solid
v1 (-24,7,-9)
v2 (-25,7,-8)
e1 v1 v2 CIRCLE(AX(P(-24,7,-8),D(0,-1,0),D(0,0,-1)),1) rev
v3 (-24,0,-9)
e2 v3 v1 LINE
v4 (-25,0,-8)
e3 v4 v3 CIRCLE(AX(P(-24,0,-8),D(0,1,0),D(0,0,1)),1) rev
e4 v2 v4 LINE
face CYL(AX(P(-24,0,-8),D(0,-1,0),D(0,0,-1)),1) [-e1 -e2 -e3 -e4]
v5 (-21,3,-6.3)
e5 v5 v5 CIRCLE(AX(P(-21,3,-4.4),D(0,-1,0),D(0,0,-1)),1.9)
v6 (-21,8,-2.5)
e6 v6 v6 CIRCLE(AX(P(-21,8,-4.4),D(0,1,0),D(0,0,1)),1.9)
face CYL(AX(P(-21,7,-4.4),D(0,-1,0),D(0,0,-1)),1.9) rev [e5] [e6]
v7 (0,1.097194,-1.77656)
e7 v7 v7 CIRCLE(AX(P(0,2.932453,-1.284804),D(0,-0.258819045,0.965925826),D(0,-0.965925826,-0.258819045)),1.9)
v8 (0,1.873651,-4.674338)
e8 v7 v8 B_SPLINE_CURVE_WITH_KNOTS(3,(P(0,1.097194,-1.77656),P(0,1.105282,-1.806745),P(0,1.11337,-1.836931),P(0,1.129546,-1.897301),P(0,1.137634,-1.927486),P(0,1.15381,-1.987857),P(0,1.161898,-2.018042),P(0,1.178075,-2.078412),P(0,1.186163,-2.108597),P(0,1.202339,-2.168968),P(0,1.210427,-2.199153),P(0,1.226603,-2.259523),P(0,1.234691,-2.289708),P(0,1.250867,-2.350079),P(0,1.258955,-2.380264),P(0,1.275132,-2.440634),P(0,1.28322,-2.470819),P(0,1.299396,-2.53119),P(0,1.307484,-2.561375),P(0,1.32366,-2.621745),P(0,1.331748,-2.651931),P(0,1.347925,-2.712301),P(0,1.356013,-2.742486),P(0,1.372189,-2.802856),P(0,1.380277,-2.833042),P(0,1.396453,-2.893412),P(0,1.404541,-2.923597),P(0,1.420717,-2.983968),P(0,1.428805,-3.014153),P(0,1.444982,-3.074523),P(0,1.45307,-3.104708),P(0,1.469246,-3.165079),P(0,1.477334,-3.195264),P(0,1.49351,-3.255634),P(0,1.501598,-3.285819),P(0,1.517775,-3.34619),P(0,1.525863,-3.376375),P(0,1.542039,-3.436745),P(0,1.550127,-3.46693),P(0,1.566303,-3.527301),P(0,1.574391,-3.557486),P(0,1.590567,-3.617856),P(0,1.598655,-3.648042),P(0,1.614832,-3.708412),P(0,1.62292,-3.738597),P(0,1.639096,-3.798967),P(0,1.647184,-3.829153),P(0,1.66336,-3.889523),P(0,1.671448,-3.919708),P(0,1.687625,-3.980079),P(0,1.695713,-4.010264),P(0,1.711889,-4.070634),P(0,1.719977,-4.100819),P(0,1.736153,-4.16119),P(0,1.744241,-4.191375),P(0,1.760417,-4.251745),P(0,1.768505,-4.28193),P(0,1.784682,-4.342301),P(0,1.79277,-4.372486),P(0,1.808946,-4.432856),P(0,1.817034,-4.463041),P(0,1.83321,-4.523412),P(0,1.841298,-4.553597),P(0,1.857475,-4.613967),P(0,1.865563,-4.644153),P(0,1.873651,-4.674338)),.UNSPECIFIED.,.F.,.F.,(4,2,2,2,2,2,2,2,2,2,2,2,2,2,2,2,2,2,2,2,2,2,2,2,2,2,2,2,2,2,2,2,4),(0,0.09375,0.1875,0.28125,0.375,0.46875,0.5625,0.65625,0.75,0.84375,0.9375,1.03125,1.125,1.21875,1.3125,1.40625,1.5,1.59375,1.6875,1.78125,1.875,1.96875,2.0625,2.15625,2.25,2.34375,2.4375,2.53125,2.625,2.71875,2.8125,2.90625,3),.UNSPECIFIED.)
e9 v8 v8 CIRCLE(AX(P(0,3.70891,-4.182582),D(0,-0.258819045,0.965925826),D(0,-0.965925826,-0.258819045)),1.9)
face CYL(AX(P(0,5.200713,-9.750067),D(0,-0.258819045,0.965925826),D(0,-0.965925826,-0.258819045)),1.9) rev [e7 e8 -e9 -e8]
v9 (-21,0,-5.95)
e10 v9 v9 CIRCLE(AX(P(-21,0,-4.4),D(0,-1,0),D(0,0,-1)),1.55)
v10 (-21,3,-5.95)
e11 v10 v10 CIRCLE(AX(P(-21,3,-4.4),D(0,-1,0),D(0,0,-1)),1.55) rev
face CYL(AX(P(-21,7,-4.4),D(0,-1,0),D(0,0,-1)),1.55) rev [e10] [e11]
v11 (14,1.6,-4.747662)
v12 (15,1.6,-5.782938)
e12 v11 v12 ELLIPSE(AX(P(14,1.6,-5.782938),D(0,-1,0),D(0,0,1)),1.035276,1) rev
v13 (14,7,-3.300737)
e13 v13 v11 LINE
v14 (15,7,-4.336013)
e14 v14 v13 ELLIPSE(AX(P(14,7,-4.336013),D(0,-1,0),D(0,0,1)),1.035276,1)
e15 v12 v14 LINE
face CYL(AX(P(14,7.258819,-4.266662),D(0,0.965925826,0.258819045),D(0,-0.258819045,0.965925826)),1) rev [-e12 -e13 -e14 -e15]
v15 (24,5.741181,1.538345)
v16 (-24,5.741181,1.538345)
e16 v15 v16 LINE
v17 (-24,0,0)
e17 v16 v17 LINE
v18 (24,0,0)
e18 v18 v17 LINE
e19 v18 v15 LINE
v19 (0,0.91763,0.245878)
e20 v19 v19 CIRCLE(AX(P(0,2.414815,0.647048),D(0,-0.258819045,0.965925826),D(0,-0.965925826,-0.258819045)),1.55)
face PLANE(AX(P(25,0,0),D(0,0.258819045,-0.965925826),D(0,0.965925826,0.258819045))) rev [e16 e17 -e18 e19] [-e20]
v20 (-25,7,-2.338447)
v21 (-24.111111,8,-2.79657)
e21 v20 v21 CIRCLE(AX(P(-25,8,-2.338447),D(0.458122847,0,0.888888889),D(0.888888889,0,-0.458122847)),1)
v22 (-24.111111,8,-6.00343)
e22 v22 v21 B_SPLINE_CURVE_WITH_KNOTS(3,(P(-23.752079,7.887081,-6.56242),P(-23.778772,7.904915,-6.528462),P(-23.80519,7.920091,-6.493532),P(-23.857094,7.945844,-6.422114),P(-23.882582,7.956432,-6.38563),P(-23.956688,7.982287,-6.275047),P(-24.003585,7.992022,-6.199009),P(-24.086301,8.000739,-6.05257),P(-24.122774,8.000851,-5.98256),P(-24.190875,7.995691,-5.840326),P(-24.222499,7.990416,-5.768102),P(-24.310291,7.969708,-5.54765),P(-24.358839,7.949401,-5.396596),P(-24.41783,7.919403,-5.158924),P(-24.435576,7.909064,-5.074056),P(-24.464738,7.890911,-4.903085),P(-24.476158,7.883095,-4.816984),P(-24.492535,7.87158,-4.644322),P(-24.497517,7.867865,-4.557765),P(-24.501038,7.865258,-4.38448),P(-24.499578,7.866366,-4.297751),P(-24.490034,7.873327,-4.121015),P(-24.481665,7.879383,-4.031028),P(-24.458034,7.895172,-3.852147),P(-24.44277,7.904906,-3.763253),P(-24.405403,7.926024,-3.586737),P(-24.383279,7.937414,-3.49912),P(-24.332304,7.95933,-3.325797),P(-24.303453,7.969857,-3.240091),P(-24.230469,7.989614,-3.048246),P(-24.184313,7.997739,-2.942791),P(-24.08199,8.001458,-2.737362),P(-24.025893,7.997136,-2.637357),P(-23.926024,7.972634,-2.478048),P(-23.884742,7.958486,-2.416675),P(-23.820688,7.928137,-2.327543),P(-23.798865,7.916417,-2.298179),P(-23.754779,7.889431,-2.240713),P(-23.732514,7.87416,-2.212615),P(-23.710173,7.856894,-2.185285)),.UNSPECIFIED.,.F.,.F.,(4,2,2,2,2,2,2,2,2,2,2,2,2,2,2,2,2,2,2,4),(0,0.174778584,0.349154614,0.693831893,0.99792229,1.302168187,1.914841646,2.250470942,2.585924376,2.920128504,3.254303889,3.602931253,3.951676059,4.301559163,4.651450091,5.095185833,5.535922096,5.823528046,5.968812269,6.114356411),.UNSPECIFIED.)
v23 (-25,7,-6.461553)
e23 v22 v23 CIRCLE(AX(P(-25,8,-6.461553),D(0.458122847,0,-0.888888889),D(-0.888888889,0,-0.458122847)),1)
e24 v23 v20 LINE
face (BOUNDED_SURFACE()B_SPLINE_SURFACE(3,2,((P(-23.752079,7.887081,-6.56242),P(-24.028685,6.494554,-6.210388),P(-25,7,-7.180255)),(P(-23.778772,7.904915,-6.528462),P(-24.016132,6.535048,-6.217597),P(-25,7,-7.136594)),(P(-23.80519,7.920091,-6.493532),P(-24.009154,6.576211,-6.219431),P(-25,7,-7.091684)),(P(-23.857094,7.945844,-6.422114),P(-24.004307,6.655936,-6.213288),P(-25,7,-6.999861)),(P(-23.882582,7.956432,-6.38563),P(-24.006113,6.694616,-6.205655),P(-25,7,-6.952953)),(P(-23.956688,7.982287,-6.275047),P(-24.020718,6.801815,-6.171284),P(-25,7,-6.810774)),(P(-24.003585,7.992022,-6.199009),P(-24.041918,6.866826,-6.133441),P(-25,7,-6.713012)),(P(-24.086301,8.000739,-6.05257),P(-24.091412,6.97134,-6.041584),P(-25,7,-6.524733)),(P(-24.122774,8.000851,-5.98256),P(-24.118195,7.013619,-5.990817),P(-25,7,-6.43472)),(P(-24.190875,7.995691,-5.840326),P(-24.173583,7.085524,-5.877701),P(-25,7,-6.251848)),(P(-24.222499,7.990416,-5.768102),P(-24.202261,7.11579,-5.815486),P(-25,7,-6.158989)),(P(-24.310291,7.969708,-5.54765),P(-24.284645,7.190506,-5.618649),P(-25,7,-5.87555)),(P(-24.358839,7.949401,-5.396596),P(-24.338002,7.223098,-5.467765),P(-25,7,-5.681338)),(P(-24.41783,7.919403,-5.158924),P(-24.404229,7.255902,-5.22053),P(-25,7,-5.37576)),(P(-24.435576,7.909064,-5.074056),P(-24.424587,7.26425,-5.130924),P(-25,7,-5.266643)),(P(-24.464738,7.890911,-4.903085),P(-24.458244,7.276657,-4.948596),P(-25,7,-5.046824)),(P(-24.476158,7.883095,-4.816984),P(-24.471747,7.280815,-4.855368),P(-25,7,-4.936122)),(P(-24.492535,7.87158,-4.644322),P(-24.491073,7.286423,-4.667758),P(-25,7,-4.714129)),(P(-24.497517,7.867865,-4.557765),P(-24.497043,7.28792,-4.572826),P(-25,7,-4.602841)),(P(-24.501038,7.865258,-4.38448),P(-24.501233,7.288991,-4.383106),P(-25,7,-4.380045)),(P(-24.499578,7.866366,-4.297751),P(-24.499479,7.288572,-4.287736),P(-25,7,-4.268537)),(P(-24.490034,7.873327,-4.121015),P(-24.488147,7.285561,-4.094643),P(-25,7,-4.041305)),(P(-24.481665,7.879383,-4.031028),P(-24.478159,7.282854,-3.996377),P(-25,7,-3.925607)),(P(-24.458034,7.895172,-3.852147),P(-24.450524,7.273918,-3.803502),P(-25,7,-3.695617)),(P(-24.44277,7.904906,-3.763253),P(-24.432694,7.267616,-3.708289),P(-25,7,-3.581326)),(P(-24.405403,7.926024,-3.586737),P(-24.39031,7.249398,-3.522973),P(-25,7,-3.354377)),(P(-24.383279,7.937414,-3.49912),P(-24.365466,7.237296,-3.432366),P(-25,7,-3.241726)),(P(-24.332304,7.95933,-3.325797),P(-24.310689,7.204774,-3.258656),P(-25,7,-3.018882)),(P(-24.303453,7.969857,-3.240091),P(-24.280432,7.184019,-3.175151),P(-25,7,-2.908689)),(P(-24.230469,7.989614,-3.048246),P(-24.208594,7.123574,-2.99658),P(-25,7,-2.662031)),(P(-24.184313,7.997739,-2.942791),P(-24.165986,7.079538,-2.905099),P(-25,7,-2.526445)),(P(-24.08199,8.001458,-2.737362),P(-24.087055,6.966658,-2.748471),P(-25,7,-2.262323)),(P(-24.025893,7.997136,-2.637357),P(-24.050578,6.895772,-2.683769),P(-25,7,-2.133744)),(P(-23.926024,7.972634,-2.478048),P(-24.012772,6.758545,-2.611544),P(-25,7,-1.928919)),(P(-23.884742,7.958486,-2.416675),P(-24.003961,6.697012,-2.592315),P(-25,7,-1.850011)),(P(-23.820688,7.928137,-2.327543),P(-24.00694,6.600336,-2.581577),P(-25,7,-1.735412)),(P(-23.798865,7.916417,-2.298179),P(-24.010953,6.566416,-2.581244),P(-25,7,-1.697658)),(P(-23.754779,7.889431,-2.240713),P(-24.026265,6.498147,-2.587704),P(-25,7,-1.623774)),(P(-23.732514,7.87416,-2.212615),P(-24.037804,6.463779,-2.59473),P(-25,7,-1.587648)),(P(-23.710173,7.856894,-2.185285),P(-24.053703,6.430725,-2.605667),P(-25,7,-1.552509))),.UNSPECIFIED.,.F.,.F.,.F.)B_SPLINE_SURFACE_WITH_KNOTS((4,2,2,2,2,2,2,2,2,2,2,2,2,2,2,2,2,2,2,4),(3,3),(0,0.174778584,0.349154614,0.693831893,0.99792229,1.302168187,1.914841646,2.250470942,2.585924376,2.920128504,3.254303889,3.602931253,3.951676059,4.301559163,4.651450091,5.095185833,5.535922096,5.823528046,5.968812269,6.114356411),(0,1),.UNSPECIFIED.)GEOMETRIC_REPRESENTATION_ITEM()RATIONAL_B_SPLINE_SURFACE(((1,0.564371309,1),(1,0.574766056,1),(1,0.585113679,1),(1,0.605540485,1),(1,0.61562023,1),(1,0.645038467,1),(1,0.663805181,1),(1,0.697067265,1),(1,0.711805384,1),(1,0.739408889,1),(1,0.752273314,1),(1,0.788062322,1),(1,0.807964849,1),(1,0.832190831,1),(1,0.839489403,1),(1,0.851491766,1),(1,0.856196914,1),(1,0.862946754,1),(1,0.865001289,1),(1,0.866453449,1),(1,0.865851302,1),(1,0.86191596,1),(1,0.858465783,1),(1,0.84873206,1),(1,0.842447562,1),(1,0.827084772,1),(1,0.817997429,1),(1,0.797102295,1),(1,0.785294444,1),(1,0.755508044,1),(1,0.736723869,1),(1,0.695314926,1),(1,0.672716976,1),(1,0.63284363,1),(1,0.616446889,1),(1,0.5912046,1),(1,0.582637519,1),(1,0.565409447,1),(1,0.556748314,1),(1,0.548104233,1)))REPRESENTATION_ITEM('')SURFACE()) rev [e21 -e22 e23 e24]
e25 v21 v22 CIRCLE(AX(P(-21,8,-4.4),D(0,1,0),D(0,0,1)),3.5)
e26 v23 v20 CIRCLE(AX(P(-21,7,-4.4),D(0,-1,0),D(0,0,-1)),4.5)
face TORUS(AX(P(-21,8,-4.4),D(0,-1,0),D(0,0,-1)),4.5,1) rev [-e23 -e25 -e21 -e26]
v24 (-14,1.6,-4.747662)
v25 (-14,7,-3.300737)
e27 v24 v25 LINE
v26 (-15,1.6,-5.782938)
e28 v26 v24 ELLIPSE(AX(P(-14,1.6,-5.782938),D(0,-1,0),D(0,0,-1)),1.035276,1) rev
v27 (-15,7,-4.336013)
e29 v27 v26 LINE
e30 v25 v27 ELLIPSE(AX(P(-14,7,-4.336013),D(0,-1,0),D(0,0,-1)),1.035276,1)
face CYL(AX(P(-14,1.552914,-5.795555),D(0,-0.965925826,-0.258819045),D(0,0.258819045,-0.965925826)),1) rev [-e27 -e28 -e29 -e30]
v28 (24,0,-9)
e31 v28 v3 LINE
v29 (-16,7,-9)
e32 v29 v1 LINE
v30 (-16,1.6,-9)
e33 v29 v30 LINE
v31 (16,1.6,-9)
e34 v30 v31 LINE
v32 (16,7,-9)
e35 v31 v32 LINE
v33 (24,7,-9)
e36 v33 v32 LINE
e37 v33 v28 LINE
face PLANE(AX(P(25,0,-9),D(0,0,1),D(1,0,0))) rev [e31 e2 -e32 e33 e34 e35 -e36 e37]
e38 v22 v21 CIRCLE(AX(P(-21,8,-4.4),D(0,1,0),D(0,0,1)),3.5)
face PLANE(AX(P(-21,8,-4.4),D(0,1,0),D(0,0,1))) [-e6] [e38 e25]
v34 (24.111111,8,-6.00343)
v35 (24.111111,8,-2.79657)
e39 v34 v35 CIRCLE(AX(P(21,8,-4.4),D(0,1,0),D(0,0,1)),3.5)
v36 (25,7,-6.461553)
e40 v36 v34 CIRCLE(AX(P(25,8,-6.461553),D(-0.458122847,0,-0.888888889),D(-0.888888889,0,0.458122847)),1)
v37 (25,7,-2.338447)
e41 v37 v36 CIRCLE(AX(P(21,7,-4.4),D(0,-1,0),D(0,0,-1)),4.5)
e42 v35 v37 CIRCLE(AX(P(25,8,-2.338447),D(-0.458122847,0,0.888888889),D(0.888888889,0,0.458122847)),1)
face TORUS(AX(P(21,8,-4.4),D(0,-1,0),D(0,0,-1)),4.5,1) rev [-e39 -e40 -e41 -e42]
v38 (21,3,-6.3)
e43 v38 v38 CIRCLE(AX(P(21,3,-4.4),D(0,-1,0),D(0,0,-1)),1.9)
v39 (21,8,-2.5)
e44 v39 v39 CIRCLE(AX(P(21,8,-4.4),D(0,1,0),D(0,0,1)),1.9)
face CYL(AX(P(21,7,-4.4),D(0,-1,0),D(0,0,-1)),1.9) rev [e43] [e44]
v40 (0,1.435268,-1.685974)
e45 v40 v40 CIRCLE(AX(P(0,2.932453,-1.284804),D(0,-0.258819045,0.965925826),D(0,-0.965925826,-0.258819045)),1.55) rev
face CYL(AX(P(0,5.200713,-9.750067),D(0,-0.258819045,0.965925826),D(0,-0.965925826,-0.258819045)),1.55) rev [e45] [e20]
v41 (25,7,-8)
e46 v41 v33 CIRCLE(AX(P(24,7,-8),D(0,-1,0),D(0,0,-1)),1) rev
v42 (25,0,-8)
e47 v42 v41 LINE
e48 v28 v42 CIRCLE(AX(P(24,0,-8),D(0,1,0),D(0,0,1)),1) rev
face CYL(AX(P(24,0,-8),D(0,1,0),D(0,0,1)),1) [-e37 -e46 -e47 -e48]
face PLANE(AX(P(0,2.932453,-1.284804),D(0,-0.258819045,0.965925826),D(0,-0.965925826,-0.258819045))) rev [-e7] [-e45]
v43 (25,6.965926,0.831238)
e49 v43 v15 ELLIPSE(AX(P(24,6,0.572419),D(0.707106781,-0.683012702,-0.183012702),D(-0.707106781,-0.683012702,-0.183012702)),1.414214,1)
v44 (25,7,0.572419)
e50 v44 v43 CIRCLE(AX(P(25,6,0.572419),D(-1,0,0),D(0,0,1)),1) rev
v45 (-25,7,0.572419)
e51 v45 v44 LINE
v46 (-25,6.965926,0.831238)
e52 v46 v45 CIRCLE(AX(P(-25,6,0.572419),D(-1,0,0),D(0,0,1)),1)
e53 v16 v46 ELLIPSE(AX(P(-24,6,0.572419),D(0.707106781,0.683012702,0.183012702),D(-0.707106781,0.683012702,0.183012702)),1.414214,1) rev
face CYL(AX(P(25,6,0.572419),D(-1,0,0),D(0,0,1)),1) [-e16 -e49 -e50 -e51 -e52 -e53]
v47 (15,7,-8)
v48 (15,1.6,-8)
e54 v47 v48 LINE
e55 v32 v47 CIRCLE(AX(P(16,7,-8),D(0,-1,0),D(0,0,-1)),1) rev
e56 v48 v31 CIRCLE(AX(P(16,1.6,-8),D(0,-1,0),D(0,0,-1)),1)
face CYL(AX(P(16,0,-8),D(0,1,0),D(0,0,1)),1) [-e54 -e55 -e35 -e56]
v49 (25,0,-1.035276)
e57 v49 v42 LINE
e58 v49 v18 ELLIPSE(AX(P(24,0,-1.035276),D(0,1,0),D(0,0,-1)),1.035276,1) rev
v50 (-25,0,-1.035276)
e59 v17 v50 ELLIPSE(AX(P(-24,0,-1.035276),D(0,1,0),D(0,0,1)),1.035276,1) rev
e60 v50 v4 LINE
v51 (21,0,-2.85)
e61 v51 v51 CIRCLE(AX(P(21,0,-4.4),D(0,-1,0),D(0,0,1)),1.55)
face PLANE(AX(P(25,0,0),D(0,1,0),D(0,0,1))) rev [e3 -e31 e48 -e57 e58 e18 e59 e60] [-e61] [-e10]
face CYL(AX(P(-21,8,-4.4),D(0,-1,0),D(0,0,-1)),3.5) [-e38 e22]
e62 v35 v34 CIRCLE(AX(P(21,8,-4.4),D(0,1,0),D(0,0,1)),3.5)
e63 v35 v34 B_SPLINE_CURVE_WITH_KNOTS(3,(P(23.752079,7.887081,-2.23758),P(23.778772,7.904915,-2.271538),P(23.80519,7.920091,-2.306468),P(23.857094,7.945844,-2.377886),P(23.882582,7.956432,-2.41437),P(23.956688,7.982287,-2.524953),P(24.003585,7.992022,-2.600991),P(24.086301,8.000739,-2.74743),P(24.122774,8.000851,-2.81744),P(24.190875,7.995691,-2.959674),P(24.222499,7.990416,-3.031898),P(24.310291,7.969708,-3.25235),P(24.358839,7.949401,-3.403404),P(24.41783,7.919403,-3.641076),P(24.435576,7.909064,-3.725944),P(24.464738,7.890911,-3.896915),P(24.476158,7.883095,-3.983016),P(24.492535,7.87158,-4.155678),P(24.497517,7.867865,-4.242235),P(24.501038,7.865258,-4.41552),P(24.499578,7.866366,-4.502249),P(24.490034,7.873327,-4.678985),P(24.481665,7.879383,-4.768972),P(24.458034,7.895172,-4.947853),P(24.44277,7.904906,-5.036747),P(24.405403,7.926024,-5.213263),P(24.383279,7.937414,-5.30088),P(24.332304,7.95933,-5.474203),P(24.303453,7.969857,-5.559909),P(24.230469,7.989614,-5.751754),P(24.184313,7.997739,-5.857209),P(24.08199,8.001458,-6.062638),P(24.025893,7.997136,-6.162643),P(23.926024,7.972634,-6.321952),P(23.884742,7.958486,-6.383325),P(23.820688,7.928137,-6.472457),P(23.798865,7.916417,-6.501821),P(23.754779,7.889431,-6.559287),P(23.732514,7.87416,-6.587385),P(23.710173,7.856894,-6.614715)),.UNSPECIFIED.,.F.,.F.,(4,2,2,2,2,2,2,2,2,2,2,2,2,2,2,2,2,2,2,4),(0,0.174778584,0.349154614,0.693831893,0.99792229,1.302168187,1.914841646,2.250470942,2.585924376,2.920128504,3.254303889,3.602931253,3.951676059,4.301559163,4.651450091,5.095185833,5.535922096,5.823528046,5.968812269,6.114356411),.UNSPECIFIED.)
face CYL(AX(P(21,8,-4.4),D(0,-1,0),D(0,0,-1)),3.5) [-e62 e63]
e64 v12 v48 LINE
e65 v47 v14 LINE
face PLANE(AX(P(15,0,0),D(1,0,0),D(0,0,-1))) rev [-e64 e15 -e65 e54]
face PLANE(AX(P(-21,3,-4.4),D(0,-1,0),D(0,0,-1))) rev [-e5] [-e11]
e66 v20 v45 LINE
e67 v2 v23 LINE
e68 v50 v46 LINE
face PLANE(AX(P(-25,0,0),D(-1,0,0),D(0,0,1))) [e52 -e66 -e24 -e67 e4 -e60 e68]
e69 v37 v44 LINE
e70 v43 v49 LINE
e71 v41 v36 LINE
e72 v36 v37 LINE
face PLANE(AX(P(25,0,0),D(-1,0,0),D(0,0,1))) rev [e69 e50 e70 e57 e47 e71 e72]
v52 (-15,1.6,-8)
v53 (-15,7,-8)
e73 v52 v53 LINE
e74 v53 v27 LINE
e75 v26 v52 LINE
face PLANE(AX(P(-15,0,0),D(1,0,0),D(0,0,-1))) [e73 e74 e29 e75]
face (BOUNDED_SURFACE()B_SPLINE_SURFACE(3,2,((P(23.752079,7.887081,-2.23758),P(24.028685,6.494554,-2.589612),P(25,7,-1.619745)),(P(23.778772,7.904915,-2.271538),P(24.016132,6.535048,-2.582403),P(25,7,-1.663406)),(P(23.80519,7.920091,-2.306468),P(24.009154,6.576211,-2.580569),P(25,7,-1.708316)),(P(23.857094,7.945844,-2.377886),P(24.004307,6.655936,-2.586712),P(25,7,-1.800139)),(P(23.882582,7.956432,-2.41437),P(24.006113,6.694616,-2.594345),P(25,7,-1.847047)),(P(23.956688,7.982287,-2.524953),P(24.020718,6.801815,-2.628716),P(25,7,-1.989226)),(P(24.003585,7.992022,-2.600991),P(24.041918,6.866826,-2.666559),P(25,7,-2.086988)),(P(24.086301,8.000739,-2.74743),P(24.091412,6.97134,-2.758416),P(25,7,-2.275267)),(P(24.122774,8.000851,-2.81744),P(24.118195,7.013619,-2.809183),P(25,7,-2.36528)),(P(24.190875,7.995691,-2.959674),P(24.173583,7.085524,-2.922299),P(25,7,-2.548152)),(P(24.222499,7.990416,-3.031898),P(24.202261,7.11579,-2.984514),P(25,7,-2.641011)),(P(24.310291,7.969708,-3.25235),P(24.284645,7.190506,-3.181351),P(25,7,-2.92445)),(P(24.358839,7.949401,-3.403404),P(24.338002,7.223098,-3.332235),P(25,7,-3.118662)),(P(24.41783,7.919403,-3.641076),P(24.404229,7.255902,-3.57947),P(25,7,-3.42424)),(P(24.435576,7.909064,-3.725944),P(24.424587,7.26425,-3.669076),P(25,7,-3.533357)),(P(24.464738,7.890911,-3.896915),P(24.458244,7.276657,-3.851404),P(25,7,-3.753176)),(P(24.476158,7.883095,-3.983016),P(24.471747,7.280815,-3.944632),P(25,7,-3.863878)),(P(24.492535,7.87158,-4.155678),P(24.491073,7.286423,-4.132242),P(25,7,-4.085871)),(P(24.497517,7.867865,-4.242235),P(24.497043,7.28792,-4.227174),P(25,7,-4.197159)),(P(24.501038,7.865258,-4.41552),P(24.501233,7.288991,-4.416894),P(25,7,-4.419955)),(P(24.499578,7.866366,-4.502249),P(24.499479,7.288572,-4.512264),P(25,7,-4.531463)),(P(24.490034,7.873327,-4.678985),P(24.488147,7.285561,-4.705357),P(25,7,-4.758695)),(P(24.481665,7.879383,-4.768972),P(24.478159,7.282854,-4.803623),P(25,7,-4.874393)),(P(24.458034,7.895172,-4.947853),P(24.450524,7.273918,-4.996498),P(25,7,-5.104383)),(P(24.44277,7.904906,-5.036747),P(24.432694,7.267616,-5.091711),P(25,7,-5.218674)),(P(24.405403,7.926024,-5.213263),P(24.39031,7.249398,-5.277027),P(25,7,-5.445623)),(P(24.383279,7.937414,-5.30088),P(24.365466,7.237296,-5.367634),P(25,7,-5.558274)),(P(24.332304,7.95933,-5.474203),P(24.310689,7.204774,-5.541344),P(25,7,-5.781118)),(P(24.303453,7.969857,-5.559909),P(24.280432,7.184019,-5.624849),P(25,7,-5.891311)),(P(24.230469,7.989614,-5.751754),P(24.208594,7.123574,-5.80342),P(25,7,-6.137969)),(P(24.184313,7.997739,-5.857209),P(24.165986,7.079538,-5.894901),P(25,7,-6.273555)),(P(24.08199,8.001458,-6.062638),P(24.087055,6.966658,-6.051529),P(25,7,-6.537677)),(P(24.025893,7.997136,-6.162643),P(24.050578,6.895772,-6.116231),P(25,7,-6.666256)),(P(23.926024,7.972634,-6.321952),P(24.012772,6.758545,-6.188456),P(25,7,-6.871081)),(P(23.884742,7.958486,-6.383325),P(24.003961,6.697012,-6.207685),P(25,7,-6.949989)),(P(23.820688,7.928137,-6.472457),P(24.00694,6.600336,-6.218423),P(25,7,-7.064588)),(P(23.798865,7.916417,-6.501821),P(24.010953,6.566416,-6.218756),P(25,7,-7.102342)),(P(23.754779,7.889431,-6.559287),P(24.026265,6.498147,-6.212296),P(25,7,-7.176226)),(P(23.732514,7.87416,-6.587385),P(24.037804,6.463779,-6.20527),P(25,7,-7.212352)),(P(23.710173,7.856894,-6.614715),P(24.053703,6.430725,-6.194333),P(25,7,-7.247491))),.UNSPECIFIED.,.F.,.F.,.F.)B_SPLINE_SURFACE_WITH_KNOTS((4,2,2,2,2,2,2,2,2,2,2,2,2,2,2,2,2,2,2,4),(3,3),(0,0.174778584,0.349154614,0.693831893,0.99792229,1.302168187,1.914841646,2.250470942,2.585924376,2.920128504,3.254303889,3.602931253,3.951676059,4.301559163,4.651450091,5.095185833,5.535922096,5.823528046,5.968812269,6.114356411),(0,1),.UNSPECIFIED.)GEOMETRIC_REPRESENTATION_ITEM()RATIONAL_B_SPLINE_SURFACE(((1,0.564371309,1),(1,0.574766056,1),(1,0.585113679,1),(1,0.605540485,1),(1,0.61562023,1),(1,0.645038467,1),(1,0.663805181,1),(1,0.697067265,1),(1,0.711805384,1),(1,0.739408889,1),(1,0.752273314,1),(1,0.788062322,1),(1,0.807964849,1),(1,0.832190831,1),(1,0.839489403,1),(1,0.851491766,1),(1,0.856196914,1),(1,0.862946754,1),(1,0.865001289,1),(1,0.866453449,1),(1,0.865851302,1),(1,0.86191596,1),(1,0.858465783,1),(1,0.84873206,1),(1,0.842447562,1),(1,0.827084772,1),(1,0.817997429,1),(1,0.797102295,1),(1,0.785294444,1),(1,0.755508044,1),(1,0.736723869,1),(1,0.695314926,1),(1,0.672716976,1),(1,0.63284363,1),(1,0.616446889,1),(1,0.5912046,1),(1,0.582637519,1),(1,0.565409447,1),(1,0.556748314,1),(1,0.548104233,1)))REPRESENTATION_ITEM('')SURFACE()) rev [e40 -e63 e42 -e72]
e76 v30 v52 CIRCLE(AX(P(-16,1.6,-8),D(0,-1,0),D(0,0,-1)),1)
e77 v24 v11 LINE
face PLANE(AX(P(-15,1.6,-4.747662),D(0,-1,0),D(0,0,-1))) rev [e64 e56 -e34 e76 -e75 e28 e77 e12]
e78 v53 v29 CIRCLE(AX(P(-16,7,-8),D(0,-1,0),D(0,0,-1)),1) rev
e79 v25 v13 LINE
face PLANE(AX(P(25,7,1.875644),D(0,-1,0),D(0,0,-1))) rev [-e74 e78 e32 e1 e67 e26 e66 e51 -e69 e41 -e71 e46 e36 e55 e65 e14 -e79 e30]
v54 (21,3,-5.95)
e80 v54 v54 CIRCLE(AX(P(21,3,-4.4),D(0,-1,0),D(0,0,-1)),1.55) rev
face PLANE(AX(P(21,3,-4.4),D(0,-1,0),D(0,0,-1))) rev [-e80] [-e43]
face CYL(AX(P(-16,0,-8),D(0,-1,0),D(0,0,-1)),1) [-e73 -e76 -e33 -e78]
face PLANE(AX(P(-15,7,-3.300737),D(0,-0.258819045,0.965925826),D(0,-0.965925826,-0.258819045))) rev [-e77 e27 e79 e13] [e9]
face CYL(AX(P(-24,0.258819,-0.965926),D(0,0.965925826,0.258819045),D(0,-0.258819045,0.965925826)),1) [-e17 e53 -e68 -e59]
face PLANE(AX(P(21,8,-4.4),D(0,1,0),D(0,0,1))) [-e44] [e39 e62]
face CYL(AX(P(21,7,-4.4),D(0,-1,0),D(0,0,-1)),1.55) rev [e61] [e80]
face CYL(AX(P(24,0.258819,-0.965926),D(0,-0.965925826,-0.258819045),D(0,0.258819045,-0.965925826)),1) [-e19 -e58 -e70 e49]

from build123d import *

# Parameters (mm, degrees)
BOSS_EXTRU_1_DEPTH      = 25
ESQUISSE2_R             = 1.55
ENL_V_MAT_EXTRU_1_DEPTH = 28.477263328
ENL_V_START             = -3
ESQUISSE3_R             = 1.9
ENL_V_MAT_EXTRU_2_DEPTH = 25.477263328
ESQUISSE4_R             = 3.5
ESQUISSE4_R_2           = 1.9
BOSS_EXTRU_2_DEPTH      = 8
ENL_V_MAT_EXTRU_3_DEPTH = 15
ESQUISSE7_R             = 1.55
ENL_V_MAT_EXTRU_4_DEPTH = 28.748873851
ENL_V_START_2           = -2
ESQUISSE8_R             = 1.9
ENL_V_MAT_EXTRU_5_DEPTH = 26.748873851
CONG_1_R                = 1
CONG_2_START            = -26
CONG_2_DEPTH            = 52


with BuildPart() as part:
    # Esquisse1 → Boss.-Extru.1 (new, symmetric)
    with BuildSketch(Plane(origin=(0, 0, 0), x_dir=(0, 0, -1), z_dir=(1, 0, 0))):
        Polygon((0, 0), (9, 0), (9, 7), (-1.875644347, 7), align=None)
    extrude(amount=BOSS_EXTRU_1_DEPTH, both=True)

    # Esquisse2 → Enlèv. mat.-Extru.1 (cut, through all)
    with BuildSketch(Plane.XZ):
        with Locations(Location((-21, -4.4, 0), (0, 0, 270))):
            Circle(ESQUISSE2_R)
        with Locations(Location((21, -4.4, 0), (0, 0, 90))):
            Circle(ESQUISSE2_R)
    extrude(amount=-ENL_V_MAT_EXTRU_1_DEPTH, mode=Mode.SUBTRACT)

    # Esquisse3 → Enlèv. mat.-Extru.2 (cut, through all)
    with BuildSketch(Plane.XZ.offset(ENL_V_START)):
        with Locations(Location((-21, -4.4, 0), (0, 0, 270))):
            Circle(ESQUISSE3_R)
        with Locations(Location((21, -4.4, 0), (0, 0, 270))):
            Circle(ESQUISSE3_R)
    extrude(amount=-ENL_V_MAT_EXTRU_2_DEPTH, mode=Mode.SUBTRACT)

    # Esquisse4 → Boss.-Extru.2 (add)
    # profile 1 of 2: a face of its own
    with BuildSketch(Plane(origin=(0, 0, 0), x_dir=(1, 0, 0), z_dir=(0, 1, 0))):
        with Locations(Location((-21, 4.4, 0), (0, 0, 90))):
            Circle(ESQUISSE4_R)
        with Locations(Location((-21, 4.4, 0), (0, 0, 90))):
            Circle(ESQUISSE4_R_2, mode=Mode.SUBTRACT)
    # profile 2 of 2: a face of its own
    with BuildSketch(Plane(origin=(0, 0, 0), x_dir=(1, 0, 0), z_dir=(0, 1, 0))):
        with Locations(Location((21, 4.4, 0), (0, 0, 90))):
            Circle(ESQUISSE4_R)
        with Locations(Location((21, 4.4, 0), (0, 0, 90))):
            Circle(ESQUISSE4_R_2, mode=Mode.SUBTRACT)
    extrude(amount=BOSS_EXTRU_2_DEPTH)

    # Esquisse6 → Enlèv. mat.-Extru.3 (cut, symmetric)
    with BuildSketch(Plane(origin=(0, 0, 0), x_dir=(0, 0, -1), z_dir=(1, 0, 0))):
        Polygon((3.300736555, 7), (4.747662194, 1.6), (9, 1.6), (9, 7), align=None)
    extrude(amount=ENL_V_MAT_EXTRU_3_DEPTH, both=True, mode=Mode.SUBTRACT)

    # Esquisse7 → Enlèv. mat.-Extru.4 (cut, through all)
    with BuildSketch(Plane(origin=(0, 0, 0), x_dir=(1, 0, 0), z_dir=(0, -0.25881904510252496, 0.9659258262890672))):
        with Locations(Location((0, 2.5, 0), (0, 0, 270))):
            Circle(ESQUISSE7_R)
    extrude(amount=-ENL_V_MAT_EXTRU_4_DEPTH, mode=Mode.SUBTRACT)

    # Esquisse8 → Enlèv. mat.-Extru.5 (cut, through all)
    with BuildSketch(Plane(origin=(0, 0, 0), x_dir=(1, 0, 0), z_dir=(0, -0.25881904510252496, 0.9659258262890672)).offset(ENL_V_START_2)):
        with Locations(Location((0, 2.5, 0), (0, 0, 270))):
            Circle(ESQUISSE8_R)
    extrude(amount=-ENL_V_MAT_EXTRU_5_DEPTH, mode=Mode.SUBTRACT)

    # Congé1
    cong_1_edges = [part.edges().sort_by_distance(p)[0] for p in [
        (25, 3.5, -9),
        (-21, 7, -0.9),
        (25, 3.5, 0.937822174),
        (21, 7, -0.9),
        (-25, 3.5, -9),
        (-25, 3.5, 0.937822174),
        (-15, 4.3, -9),
        (-15, 4.3, -4.024199375),
        (15, 4.3, -9),
        (15, 4.3, -4.024199375),
    ]]
    fillet(cong_1_edges, radius=CONG_1_R - 0.0001)  # a hair under: the kernel refuses the full size

    # Congé2: read off the stored shape, not the designer's step
    # Congé2 outline → Congé2 (cut)
    with BuildSketch(Plane.YZ.offset(CONG_2_START)):
        with BuildLine():
            Line((7, 1.875644347), (5.741180955, 1.5383448))
            ThreePointArc((5.741180955, 1.5383448), (6.608761429, 1.365772314), (7, 0.572418974))
            Line((7, 0.572418974), (7, 1.875644347))
        make_face()
    extrude(amount=CONG_2_DEPTH, mode=Mode.SUBTRACT)


solid = part.part
